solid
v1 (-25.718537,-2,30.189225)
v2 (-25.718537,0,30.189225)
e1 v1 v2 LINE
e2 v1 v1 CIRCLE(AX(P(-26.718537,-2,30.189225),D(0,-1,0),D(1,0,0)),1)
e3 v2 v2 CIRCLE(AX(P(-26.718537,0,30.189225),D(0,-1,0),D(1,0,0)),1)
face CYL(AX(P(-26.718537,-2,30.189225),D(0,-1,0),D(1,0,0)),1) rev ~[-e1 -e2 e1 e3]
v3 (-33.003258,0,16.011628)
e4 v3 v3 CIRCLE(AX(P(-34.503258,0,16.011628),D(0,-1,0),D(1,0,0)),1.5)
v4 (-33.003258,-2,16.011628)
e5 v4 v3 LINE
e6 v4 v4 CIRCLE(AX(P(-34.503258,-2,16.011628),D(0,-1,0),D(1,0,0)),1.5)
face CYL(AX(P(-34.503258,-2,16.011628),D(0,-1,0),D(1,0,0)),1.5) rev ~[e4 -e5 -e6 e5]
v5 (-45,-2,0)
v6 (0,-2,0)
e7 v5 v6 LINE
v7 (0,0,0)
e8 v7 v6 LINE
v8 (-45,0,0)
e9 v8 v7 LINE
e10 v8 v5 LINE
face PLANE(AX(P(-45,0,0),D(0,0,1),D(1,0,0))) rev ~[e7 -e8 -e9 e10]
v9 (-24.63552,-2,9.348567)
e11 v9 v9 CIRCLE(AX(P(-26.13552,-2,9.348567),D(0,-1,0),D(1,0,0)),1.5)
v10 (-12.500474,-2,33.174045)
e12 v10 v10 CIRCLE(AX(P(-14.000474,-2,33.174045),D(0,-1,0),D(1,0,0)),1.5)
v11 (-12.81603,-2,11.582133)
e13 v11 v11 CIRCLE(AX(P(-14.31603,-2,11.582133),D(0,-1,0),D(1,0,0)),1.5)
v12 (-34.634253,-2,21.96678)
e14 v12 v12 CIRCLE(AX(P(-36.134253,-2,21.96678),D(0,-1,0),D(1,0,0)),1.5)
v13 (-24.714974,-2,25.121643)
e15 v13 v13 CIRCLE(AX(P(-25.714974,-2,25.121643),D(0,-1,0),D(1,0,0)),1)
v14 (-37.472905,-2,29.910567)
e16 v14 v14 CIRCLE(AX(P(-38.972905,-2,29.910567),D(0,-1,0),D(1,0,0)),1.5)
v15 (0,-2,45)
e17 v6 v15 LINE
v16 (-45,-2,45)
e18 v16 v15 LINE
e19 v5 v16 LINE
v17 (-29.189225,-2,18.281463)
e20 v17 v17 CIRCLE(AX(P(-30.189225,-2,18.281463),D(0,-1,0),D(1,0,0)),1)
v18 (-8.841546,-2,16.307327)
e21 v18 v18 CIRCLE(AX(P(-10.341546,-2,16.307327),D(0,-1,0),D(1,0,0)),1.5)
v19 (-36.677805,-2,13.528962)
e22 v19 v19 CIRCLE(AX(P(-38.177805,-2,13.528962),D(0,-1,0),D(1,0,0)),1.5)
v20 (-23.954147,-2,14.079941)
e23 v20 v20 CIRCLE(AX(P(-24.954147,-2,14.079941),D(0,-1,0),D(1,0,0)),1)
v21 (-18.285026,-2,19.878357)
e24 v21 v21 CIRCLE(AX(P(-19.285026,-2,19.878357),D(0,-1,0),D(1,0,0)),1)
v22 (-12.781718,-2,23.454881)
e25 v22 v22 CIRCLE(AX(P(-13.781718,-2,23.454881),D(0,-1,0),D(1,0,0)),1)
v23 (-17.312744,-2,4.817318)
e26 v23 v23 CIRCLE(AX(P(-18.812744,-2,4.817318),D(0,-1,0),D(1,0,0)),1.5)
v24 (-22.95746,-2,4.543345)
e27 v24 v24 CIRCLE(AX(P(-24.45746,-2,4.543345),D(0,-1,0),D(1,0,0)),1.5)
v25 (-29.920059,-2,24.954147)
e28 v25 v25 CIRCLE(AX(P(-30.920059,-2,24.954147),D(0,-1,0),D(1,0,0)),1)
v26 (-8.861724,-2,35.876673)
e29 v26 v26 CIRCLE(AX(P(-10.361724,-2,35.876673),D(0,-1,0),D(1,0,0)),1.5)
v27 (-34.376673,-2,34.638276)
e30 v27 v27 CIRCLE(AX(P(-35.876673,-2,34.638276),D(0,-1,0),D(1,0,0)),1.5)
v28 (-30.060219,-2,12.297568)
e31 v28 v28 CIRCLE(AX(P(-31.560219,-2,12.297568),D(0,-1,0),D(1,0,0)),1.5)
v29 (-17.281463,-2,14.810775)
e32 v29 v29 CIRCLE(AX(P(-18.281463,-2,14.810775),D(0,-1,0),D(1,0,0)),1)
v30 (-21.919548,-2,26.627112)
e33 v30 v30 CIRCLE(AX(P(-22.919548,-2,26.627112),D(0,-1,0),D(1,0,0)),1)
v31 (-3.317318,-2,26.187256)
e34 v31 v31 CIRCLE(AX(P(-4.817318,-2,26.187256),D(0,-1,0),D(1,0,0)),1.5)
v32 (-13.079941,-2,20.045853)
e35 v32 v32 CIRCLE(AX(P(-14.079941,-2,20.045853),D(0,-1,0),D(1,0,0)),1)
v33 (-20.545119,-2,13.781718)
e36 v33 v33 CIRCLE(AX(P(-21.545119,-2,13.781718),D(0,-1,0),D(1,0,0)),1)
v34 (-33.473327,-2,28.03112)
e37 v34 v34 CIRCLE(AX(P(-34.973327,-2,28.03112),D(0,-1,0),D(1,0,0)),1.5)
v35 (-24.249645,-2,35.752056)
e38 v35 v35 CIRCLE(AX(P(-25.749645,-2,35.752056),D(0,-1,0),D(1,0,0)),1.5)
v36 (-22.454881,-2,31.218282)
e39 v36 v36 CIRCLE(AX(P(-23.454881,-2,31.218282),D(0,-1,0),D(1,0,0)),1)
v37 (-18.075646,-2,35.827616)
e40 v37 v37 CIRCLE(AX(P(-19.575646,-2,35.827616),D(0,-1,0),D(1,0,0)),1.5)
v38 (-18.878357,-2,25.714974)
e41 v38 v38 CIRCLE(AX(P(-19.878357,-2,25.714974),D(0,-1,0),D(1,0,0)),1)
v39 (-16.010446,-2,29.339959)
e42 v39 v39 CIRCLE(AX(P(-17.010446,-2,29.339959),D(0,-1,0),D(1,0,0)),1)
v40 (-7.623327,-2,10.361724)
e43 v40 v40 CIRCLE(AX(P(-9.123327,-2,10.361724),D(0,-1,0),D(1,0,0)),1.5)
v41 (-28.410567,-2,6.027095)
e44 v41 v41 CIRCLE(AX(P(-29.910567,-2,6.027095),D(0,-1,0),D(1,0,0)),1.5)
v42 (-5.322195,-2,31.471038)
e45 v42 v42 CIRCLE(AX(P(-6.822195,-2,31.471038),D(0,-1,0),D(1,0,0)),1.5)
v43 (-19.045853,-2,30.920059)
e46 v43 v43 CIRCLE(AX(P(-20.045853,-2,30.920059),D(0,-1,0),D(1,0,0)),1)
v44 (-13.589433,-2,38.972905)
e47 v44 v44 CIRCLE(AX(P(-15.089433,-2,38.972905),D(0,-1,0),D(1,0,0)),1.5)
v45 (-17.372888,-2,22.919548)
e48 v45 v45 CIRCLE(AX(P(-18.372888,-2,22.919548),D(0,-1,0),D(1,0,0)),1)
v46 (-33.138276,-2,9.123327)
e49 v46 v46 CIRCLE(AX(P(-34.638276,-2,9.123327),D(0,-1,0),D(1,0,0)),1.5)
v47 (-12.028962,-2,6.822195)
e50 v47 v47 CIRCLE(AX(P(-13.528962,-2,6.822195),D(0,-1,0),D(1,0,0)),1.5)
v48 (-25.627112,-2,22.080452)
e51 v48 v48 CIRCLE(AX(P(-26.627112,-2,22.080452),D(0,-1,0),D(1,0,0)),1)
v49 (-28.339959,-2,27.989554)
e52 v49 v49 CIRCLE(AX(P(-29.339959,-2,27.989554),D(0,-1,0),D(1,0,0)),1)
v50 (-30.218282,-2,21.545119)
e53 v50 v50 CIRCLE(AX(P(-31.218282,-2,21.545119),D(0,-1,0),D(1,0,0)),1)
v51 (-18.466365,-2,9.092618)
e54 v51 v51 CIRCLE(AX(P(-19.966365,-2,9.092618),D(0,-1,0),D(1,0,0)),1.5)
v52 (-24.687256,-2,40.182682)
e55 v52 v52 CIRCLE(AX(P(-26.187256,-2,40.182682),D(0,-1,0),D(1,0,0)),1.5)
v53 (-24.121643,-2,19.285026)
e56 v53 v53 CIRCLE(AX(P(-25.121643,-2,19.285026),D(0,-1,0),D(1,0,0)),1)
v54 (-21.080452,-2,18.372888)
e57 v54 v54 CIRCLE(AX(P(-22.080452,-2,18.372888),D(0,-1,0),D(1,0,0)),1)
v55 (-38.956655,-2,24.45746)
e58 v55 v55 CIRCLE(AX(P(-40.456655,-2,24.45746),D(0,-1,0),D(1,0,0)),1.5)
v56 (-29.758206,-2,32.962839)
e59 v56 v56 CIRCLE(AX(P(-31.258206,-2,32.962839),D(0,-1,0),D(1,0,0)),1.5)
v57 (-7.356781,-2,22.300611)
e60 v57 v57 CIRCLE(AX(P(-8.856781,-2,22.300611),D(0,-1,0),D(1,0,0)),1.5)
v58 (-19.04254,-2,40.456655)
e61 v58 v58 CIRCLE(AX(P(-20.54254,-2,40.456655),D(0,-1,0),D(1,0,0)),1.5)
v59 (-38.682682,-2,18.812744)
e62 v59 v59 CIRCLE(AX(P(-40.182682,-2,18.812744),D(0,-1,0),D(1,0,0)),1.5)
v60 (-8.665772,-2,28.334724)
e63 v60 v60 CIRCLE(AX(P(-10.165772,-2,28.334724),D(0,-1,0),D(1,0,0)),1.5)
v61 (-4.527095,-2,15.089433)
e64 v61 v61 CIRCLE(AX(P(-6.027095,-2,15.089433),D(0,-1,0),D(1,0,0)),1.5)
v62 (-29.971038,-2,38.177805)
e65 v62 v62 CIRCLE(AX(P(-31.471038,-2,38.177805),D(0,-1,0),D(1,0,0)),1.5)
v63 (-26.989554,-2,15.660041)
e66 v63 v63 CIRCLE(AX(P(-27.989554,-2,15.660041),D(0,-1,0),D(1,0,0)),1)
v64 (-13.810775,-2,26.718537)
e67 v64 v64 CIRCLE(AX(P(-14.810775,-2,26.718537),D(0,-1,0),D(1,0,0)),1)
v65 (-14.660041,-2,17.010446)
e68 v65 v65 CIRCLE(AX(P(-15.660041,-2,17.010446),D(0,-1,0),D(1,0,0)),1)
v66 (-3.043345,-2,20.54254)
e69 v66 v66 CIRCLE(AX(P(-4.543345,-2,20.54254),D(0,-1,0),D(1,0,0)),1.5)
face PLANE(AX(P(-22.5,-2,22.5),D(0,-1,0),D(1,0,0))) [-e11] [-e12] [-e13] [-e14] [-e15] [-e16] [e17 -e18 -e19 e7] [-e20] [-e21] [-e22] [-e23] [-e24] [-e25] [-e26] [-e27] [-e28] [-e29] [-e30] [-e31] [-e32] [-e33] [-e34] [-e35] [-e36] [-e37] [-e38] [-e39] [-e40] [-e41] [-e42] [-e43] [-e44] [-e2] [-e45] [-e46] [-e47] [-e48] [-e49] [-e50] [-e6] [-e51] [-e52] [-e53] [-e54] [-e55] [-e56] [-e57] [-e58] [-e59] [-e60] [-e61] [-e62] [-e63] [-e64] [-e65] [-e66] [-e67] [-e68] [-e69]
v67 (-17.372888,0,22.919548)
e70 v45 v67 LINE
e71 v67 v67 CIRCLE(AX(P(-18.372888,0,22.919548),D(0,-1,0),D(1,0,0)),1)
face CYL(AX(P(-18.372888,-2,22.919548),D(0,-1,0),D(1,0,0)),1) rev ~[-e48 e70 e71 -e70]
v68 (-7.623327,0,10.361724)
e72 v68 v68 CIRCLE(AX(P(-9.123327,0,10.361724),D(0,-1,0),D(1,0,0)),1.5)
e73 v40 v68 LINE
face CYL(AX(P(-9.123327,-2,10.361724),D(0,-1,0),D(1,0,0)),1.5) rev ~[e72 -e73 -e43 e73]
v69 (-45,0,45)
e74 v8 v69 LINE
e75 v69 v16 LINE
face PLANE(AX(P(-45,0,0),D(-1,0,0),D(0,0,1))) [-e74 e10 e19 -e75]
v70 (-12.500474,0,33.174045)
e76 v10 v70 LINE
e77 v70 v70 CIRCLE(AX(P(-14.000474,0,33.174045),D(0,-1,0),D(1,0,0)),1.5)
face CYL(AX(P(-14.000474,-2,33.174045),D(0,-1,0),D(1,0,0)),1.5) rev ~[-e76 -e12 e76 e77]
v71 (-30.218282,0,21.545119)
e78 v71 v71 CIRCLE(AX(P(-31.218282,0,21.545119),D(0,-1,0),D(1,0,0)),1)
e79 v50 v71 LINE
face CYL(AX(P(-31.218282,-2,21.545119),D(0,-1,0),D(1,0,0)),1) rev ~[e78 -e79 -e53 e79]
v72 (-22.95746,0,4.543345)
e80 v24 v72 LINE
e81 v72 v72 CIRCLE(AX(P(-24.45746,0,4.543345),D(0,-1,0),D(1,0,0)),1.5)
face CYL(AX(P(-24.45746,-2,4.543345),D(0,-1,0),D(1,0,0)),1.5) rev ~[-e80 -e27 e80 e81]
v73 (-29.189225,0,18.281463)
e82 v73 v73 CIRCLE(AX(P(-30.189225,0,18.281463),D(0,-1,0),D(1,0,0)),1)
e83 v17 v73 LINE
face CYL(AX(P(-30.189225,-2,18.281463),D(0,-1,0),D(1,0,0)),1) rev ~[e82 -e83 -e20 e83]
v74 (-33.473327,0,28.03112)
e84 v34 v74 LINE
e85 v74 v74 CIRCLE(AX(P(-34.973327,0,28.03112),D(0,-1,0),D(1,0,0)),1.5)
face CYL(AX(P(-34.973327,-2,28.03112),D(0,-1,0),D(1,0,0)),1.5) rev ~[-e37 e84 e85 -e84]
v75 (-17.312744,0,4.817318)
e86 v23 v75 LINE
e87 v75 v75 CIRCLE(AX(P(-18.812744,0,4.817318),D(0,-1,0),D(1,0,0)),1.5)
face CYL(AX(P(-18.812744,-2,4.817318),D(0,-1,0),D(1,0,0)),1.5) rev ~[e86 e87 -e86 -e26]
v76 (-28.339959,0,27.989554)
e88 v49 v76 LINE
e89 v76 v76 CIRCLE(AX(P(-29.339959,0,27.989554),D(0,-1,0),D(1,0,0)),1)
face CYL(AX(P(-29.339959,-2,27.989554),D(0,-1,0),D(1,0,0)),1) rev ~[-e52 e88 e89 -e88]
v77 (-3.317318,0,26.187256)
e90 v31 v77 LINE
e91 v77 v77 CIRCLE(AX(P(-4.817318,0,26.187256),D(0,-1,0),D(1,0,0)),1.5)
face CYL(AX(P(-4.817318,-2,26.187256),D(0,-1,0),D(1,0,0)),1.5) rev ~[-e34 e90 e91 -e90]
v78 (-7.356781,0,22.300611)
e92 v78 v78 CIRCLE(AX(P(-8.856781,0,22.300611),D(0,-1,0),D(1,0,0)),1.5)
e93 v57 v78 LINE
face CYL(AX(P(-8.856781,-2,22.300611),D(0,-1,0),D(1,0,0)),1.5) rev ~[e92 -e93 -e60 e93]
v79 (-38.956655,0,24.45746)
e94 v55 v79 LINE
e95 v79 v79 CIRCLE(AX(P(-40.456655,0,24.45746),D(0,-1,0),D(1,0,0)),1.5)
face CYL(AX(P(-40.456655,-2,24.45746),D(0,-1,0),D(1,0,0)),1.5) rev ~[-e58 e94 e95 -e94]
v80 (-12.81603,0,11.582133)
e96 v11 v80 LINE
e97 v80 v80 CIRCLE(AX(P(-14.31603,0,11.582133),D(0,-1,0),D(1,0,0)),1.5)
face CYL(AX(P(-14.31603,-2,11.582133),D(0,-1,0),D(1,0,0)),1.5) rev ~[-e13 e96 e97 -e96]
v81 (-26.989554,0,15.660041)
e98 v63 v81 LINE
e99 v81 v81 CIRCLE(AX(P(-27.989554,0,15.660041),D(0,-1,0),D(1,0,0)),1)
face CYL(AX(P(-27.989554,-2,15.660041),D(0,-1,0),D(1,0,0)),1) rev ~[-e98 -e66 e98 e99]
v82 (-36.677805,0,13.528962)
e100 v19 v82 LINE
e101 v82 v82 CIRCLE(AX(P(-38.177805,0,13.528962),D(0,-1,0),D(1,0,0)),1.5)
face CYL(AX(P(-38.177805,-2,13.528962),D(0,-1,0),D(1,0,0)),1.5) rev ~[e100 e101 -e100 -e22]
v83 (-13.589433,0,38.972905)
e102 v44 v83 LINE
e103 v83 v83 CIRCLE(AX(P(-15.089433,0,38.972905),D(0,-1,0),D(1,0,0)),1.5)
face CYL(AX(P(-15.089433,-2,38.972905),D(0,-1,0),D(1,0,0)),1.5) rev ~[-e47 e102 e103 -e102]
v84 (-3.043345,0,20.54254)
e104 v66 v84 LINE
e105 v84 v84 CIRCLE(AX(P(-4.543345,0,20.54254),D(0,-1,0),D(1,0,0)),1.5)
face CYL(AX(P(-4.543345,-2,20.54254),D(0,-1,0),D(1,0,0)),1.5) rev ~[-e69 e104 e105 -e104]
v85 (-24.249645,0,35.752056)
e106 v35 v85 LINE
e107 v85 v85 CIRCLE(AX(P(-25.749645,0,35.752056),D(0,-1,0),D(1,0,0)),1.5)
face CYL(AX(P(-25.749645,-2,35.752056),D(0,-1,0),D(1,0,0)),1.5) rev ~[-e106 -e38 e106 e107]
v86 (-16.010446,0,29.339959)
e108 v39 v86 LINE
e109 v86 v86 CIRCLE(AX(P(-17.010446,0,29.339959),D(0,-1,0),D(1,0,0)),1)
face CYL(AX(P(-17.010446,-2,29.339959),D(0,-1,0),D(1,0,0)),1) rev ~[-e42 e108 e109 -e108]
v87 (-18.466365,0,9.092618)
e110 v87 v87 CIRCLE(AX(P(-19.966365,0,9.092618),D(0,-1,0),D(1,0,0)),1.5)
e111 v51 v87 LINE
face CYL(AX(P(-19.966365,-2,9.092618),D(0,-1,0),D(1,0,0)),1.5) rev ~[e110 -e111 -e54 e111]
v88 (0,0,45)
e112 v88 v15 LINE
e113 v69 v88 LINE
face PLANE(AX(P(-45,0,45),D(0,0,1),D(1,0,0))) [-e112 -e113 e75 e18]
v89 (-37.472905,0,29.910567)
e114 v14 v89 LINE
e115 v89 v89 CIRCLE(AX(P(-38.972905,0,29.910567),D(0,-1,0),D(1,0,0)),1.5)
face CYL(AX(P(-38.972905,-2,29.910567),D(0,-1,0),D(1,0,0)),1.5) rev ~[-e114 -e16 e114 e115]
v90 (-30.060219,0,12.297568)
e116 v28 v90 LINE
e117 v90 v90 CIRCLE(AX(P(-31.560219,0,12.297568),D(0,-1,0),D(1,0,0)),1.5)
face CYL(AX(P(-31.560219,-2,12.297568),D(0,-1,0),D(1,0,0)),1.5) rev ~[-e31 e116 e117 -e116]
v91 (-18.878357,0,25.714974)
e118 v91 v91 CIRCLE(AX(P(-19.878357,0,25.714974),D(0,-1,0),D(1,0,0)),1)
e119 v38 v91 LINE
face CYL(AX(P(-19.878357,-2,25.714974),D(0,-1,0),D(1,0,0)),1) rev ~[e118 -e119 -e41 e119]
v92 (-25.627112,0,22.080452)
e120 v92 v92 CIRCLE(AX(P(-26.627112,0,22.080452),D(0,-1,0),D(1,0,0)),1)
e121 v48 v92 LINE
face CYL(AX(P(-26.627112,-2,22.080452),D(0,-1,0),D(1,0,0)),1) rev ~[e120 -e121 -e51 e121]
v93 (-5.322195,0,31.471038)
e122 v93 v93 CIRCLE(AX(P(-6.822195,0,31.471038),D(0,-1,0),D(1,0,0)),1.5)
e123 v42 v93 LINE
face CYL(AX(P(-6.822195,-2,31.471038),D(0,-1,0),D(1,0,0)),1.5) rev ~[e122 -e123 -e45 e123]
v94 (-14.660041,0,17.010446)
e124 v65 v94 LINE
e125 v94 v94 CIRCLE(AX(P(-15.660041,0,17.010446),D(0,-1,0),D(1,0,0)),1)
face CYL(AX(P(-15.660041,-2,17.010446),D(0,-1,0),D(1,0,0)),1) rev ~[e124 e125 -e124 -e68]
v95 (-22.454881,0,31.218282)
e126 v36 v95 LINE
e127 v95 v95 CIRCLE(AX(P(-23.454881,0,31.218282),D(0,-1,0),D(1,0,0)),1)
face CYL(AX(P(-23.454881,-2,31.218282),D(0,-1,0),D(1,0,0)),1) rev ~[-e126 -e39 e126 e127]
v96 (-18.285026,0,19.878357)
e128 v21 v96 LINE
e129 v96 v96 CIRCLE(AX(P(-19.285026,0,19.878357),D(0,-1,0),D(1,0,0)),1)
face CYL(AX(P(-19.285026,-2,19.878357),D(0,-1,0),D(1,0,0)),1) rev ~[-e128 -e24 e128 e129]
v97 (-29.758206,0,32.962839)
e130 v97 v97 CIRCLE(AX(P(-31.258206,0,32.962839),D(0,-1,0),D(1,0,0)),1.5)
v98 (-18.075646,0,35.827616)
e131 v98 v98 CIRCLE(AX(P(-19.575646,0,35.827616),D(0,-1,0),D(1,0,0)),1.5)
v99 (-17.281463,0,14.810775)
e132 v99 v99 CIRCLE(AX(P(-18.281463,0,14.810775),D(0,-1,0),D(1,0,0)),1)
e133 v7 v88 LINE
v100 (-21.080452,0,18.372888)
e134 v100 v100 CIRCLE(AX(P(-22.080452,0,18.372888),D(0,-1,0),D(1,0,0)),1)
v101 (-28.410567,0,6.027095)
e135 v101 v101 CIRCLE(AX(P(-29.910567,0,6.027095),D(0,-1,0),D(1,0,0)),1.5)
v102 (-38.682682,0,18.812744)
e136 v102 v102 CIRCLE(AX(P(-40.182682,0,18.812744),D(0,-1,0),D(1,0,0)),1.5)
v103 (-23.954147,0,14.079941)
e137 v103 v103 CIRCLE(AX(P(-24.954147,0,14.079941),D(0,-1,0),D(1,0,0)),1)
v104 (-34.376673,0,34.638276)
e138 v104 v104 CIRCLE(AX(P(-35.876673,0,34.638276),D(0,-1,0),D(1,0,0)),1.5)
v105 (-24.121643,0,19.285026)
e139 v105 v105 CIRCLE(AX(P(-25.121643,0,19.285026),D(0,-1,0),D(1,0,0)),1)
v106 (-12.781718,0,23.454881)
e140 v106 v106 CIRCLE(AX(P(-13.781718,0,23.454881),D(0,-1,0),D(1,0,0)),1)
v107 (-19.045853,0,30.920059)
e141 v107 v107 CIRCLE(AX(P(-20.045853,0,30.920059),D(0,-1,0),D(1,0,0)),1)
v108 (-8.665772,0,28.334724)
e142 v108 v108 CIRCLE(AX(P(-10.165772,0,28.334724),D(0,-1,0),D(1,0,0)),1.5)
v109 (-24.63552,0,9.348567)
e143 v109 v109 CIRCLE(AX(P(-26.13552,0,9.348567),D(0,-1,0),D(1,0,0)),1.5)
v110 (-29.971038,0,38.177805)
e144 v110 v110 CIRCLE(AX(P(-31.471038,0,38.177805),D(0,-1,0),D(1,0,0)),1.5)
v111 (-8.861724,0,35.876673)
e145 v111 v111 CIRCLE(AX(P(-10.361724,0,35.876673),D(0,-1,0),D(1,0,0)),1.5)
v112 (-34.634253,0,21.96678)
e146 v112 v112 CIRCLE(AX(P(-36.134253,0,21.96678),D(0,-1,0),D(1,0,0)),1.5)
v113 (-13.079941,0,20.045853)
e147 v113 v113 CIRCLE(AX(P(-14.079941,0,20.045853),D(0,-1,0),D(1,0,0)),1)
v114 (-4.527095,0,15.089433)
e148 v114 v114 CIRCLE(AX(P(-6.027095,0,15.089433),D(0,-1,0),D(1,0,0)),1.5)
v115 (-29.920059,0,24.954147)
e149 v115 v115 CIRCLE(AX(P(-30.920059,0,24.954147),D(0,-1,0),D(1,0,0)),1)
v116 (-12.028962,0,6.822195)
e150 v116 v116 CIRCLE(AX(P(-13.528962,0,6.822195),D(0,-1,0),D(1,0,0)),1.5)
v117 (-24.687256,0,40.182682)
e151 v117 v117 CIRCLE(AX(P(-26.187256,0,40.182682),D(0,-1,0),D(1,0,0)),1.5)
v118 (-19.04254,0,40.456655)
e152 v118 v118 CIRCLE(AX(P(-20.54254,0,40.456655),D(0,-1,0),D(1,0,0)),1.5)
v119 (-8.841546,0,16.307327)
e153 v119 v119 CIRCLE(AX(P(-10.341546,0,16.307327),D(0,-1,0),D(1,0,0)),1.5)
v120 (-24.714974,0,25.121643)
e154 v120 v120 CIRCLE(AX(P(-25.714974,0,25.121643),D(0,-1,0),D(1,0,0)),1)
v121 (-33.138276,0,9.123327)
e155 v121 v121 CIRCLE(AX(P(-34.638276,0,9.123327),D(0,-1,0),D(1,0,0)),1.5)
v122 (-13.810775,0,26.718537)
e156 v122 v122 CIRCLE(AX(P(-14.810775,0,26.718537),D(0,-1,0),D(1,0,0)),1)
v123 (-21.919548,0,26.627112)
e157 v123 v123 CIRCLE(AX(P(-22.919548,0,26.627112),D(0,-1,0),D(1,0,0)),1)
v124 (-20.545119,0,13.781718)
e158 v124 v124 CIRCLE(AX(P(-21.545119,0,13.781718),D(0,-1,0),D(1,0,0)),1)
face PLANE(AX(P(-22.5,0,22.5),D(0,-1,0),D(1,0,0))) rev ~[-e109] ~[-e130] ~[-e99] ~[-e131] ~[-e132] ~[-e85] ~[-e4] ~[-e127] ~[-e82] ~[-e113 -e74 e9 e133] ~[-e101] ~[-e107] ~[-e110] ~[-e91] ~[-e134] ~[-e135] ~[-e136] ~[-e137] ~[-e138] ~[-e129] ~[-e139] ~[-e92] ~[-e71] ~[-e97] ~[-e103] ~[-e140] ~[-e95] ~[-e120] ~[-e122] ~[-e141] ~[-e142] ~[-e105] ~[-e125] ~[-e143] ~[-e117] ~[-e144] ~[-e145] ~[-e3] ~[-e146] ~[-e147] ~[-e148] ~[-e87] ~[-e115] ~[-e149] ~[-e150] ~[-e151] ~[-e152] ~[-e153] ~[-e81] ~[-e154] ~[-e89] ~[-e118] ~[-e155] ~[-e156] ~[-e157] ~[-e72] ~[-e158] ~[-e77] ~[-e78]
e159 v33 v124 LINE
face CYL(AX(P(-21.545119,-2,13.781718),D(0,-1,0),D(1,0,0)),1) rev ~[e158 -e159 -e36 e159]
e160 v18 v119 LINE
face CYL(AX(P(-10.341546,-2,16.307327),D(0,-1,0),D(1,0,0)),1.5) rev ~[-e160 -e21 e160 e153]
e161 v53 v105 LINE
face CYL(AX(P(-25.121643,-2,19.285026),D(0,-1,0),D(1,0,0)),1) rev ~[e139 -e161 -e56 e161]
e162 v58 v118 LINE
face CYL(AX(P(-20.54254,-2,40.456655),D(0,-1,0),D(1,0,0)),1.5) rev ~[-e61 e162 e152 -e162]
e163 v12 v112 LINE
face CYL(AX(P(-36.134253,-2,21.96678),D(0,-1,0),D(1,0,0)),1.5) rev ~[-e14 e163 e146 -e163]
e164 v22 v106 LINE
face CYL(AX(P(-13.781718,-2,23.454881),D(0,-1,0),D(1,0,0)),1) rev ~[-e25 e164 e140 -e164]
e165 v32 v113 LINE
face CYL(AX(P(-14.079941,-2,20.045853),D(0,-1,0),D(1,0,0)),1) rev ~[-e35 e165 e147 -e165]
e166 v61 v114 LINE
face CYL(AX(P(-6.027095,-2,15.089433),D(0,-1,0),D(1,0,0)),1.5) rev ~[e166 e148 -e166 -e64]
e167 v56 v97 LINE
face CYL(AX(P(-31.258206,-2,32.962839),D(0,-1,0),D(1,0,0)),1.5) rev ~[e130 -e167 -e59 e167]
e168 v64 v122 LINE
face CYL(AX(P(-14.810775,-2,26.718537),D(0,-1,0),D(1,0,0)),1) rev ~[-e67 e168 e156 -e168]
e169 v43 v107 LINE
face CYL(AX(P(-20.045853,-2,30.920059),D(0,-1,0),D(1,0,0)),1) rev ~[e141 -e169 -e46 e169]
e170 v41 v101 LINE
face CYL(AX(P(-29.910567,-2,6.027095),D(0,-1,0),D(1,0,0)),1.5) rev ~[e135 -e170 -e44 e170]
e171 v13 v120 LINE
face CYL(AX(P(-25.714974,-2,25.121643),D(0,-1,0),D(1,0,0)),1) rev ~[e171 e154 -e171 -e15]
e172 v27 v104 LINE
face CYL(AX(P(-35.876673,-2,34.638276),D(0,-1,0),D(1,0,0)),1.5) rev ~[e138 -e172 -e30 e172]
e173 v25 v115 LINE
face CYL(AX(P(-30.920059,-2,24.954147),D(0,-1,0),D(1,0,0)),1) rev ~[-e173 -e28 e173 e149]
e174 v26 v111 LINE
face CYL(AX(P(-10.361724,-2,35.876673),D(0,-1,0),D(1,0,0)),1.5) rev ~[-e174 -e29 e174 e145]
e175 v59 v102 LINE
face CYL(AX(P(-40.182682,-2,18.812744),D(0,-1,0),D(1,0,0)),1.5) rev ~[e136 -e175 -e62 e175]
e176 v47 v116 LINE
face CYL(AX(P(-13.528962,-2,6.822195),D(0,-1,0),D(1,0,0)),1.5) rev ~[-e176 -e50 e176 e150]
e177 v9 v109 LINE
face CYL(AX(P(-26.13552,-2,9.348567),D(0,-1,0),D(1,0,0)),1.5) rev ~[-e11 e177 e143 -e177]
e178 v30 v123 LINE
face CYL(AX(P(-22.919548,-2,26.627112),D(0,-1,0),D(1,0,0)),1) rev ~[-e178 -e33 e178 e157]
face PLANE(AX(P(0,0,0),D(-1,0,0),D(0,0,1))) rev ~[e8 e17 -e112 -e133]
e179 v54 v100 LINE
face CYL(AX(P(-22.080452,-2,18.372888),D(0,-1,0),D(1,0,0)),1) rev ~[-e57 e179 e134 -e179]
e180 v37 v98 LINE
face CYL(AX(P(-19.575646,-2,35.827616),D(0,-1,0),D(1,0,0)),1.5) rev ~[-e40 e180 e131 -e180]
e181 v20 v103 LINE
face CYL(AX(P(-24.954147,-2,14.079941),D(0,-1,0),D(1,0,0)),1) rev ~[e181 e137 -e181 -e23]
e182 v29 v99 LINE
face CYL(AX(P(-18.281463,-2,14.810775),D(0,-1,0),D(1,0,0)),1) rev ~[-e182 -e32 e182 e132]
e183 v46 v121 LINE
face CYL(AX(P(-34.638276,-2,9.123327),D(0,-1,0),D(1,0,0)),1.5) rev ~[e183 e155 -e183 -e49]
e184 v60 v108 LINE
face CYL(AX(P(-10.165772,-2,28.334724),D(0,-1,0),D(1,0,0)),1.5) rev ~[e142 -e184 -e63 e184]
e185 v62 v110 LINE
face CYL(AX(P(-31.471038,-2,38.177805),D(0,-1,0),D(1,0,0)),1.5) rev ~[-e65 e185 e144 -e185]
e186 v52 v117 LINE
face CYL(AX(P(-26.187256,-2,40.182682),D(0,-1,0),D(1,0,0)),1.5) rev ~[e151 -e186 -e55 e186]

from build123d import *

# Parameters (mm, degrees)
F0_W     = 45
F0_H     = 45
F1_DEPTH = 2
F2_R     = 1
F2_R_2   = 1.5
F3_DEPTH = 19.6
F4_DEPTH = 25


# Not quite as in the source:
# - a feature names something its author has since deleted; it is built from what else it names


with BuildPart() as f1:
    # F0 (on Front) → F1 (new body)
    with BuildSketch(Plane.XZ):
        with Locations((-22.5, 22.5)):
            Rectangle(F0_W, F0_H)
    extrude(amount=F1_DEPTH)

    # F2 (on face) → F3 (cut)
    with BuildSketch(Plane.XZ.offset(2)):
        with Locations((-26.6271115437, 22.0804515862)):
            Circle(F2_R)
        with Locations((-25.7149740877, 25.1216430309)):
            Circle(F2_R)
        with Locations((-22.9195484138, 26.6271115437)):
            Circle(F2_R)
        with Locations((-25.1216430309, 19.2850259123)):
            Circle(F2_R)
        with Locations((-10.3415464992, 16.307327403)):
            Circle(F2_R_2)
        with Locations((-8.8567808269, 22.3006108876)):
            Circle(F2_R_2)
        with Locations((-10.1657718628, 28.3347237882)):
            Circle(F2_R_2)
        with Locations((-14.0004741816, 33.1740454509)):
            Circle(F2_R_2)
        with Locations((-34.5032584426, 16.011627925)):
            Circle(F2_R_2)
        with Locations((-40.4566549108, 24.4574602037)):
            Circle(F2_R_2)
        with Locations((-40.1826821325, 18.8127437526)):
            Circle(F2_R_2)
        with Locations((-29.9105668117, 6.027094805)):
            Circle(F2_R_2)
        with Locations((-19.5756460311, 35.8276156641)):
            Circle(F2_R_2)
        with Locations((-18.8127437526, 4.8173178675)):
            Circle(F2_R_2)
        with Locations((-38.1778052247, 13.5289616335)):
            Circle(F2_R_2)
        with Locations((-34.6382755077, 9.1233272547)):
            Circle(F2_R_2)
        with Locations((-24.4574602037, 4.5433450892)):
            Circle(F2_R_2)
        with Locations((-25.7496452846, 35.7520561027)):
            Circle(F2_R_2)
        with Locations((-31.2582064036, 32.9628392904)):
            Circle(F2_R_2)
        with Locations((-38.972905195, 29.9105668117)):
            Circle(F2_R_2)
        with Locations((-36.1342532423, 21.9667796436)):
            Circle(F2_R_2)
        with Locations((-34.9733273102, 28.0311202515)):
            Circle(F2_R_2)
        with Locations((-13.5289616335, 6.8221947753)):
            Circle(F2_R_2)
        with Locations((-26.1872562474, 40.1826821325)):
            Circle(F2_R_2)
        with Locations((-31.4710383665, 38.1778052247)):
            Circle(F2_R_2)
        with Locations((-35.8766727453, 34.6382755077)):
            Circle(F2_R_2)
        with Locations((-9.1233272547, 10.3617244923)):
            Circle(F2_R_2)
        with Locations((-6.027094805, 15.0894331883)):
            Circle(F2_R_2)
        with Locations((-4.5433450892, 20.5425397963)):
            Circle(F2_R_2)
        with Locations((-4.8173178675, 26.1872562474)):
            Circle(F2_R_2)
    extrude(amount=-F3_DEPTH, mode=Mode.SUBTRACT)

    # F2 (on face) → F4 (cut)
    with BuildSketch(Plane.XZ.offset(2)):
        with Locations((-22.9195484138, 26.6271115437)):
            Circle(F2_R)
        with Locations((-25.7149740877, 25.1216430309)):
            Circle(F2_R)
        with Locations((-26.6271115437, 22.0804515862)):
            Circle(F2_R)
        with Locations((-25.1216430309, 19.2850259123)):
            Circle(F2_R)
        with Locations((-34.5032584426, 16.011627925)):
            Circle(F2_R_2)
        with Locations((-36.1342532423, 21.9667796436)):
            Circle(F2_R_2)
        with Locations((-34.9733273102, 28.0311202515)):
            Circle(F2_R_2)
        with Locations((-31.2582064036, 32.9628392904)):
            Circle(F2_R_2)
        with Locations((-25.7496452846, 35.7520561027)):
            Circle(F2_R_2)
        with Locations((-19.5756460311, 35.8276156641)):
            Circle(F2_R_2)
        with Locations((-14.0004741816, 33.1740454509)):
            Circle(F2_R_2)
        with Locations((-10.1657718628, 28.3347237882)):
            Circle(F2_R_2)
        with Locations((-8.8567808269, 22.3006108876)):
            Circle(F2_R_2)
        with Locations((-10.3415464992, 16.307327403)):
            Circle(F2_R_2)
        with Locations((-26.1872562474, 40.1826821325)):
            Circle(F2_R_2)
        with Locations((-31.4710383665, 38.1778052247)):
            Circle(F2_R_2)
        with Locations((-35.8766727453, 34.6382755077)):
            Circle(F2_R_2)
        with Locations((-38.972905195, 29.9105668117)):
            Circle(F2_R_2)
        with Locations((-40.4566549108, 24.4574602037)):
            Circle(F2_R_2)
        with Locations((-40.1826821325, 18.8127437526)):
            Circle(F2_R_2)
        with Locations((-38.1778052247, 13.5289616335)):
            Circle(F2_R_2)
        with Locations((-34.6382755077, 9.1233272547)):
            Circle(F2_R_2)
        with Locations((-29.9105668117, 6.027094805)):
            Circle(F2_R_2)
        with Locations((-24.4574602037, 4.5433450892)):
            Circle(F2_R_2)
        with Locations((-18.8127437526, 4.8173178675)):
            Circle(F2_R_2)
        with Locations((-13.5289616335, 6.8221947753)):
            Circle(F2_R_2)
        with Locations((-9.1233272547, 10.3617244923)):
            Circle(F2_R_2)
        with Locations((-6.027094805, 15.0894331883)):
            Circle(F2_R_2)
        with Locations((-4.5433450892, 20.5425397963)):
            Circle(F2_R_2)
        with Locations((-4.8173178675, 26.1872562474)):
            Circle(F2_R_2)
        with Locations((-14.3160296348, 11.5821332447)):
            Circle(F2_R_2)
        with Locations((-19.966365208, 9.0926184449)):
            Circle(F2_R_2)
        with Locations((-26.1355196249, 9.3485672841)):
            Circle(F2_R_2)
        with Locations((-31.5602194369, 12.2975684673)):
            Circle(F2_R_2)
        with Locations((-6.8221947753, 31.4710383665)):
            Circle(F2_R_2)
        with Locations((-10.3617244923, 35.8766727453)):
            Circle(F2_R_2)
        with Locations((-15.0894331883, 38.972905195)):
            Circle(F2_R_2)
        with Locations((-20.5425397963, 40.4566549108)):
            Circle(F2_R_2)
        with Locations((-26.7185367273, 30.1892252677)):
            Circle(F2_R)
        with Locations((-29.3399588572, 27.9895537314)):
            Circle(F2_R)
        with Locations((-30.9200592554, 24.9541474023)):
            Circle(F2_R)
        with Locations((-31.2182819601, 21.5451193782)):
            Circle(F2_R)
        with Locations((-30.1892252677, 18.2814632727)):
            Circle(F2_R)
        with Locations((-27.9895537314, 15.6600411428)):
            Circle(F2_R)
        with Locations((-24.9541474023, 14.0799407446)):
            Circle(F2_R)
        with Locations((-21.5451193782, 13.7817180399)):
            Circle(F2_R)
        with Locations((-18.2814632727, 14.8107747323)):
            Circle(F2_R)
        with Locations((-15.6600411428, 17.0104462686)):
            Circle(F2_R)
        with Locations((-22.0804515862, 18.3728884563)):
            Circle(F2_R)
        with Locations((-19.2850259123, 19.8783569691)):
            Circle(F2_R)
        with Locations((-18.3728884563, 22.9195484138)):
            Circle(F2_R)
        with Locations((-19.8783569691, 25.7149740877)):
            Circle(F2_R)
        with Locations((-14.0799407446, 20.0458525977)):
            Circle(F2_R)
        with Locations((-13.7817180399, 23.4548806218)):
            Circle(F2_R)
        with Locations((-14.8107747323, 26.7185367273)):
            Circle(F2_R)
        with Locations((-17.0104462686, 29.3399588572)):
            Circle(F2_R)
        with Locations((-20.0458525977, 30.9200592554)):
            Circle(F2_R)
        with Locations((-23.4548806218, 31.2182819601)):
            Circle(F2_R)
    extrude(amount=-F4_DEPTH, mode=Mode.SUBTRACT)


solid = f1.part
